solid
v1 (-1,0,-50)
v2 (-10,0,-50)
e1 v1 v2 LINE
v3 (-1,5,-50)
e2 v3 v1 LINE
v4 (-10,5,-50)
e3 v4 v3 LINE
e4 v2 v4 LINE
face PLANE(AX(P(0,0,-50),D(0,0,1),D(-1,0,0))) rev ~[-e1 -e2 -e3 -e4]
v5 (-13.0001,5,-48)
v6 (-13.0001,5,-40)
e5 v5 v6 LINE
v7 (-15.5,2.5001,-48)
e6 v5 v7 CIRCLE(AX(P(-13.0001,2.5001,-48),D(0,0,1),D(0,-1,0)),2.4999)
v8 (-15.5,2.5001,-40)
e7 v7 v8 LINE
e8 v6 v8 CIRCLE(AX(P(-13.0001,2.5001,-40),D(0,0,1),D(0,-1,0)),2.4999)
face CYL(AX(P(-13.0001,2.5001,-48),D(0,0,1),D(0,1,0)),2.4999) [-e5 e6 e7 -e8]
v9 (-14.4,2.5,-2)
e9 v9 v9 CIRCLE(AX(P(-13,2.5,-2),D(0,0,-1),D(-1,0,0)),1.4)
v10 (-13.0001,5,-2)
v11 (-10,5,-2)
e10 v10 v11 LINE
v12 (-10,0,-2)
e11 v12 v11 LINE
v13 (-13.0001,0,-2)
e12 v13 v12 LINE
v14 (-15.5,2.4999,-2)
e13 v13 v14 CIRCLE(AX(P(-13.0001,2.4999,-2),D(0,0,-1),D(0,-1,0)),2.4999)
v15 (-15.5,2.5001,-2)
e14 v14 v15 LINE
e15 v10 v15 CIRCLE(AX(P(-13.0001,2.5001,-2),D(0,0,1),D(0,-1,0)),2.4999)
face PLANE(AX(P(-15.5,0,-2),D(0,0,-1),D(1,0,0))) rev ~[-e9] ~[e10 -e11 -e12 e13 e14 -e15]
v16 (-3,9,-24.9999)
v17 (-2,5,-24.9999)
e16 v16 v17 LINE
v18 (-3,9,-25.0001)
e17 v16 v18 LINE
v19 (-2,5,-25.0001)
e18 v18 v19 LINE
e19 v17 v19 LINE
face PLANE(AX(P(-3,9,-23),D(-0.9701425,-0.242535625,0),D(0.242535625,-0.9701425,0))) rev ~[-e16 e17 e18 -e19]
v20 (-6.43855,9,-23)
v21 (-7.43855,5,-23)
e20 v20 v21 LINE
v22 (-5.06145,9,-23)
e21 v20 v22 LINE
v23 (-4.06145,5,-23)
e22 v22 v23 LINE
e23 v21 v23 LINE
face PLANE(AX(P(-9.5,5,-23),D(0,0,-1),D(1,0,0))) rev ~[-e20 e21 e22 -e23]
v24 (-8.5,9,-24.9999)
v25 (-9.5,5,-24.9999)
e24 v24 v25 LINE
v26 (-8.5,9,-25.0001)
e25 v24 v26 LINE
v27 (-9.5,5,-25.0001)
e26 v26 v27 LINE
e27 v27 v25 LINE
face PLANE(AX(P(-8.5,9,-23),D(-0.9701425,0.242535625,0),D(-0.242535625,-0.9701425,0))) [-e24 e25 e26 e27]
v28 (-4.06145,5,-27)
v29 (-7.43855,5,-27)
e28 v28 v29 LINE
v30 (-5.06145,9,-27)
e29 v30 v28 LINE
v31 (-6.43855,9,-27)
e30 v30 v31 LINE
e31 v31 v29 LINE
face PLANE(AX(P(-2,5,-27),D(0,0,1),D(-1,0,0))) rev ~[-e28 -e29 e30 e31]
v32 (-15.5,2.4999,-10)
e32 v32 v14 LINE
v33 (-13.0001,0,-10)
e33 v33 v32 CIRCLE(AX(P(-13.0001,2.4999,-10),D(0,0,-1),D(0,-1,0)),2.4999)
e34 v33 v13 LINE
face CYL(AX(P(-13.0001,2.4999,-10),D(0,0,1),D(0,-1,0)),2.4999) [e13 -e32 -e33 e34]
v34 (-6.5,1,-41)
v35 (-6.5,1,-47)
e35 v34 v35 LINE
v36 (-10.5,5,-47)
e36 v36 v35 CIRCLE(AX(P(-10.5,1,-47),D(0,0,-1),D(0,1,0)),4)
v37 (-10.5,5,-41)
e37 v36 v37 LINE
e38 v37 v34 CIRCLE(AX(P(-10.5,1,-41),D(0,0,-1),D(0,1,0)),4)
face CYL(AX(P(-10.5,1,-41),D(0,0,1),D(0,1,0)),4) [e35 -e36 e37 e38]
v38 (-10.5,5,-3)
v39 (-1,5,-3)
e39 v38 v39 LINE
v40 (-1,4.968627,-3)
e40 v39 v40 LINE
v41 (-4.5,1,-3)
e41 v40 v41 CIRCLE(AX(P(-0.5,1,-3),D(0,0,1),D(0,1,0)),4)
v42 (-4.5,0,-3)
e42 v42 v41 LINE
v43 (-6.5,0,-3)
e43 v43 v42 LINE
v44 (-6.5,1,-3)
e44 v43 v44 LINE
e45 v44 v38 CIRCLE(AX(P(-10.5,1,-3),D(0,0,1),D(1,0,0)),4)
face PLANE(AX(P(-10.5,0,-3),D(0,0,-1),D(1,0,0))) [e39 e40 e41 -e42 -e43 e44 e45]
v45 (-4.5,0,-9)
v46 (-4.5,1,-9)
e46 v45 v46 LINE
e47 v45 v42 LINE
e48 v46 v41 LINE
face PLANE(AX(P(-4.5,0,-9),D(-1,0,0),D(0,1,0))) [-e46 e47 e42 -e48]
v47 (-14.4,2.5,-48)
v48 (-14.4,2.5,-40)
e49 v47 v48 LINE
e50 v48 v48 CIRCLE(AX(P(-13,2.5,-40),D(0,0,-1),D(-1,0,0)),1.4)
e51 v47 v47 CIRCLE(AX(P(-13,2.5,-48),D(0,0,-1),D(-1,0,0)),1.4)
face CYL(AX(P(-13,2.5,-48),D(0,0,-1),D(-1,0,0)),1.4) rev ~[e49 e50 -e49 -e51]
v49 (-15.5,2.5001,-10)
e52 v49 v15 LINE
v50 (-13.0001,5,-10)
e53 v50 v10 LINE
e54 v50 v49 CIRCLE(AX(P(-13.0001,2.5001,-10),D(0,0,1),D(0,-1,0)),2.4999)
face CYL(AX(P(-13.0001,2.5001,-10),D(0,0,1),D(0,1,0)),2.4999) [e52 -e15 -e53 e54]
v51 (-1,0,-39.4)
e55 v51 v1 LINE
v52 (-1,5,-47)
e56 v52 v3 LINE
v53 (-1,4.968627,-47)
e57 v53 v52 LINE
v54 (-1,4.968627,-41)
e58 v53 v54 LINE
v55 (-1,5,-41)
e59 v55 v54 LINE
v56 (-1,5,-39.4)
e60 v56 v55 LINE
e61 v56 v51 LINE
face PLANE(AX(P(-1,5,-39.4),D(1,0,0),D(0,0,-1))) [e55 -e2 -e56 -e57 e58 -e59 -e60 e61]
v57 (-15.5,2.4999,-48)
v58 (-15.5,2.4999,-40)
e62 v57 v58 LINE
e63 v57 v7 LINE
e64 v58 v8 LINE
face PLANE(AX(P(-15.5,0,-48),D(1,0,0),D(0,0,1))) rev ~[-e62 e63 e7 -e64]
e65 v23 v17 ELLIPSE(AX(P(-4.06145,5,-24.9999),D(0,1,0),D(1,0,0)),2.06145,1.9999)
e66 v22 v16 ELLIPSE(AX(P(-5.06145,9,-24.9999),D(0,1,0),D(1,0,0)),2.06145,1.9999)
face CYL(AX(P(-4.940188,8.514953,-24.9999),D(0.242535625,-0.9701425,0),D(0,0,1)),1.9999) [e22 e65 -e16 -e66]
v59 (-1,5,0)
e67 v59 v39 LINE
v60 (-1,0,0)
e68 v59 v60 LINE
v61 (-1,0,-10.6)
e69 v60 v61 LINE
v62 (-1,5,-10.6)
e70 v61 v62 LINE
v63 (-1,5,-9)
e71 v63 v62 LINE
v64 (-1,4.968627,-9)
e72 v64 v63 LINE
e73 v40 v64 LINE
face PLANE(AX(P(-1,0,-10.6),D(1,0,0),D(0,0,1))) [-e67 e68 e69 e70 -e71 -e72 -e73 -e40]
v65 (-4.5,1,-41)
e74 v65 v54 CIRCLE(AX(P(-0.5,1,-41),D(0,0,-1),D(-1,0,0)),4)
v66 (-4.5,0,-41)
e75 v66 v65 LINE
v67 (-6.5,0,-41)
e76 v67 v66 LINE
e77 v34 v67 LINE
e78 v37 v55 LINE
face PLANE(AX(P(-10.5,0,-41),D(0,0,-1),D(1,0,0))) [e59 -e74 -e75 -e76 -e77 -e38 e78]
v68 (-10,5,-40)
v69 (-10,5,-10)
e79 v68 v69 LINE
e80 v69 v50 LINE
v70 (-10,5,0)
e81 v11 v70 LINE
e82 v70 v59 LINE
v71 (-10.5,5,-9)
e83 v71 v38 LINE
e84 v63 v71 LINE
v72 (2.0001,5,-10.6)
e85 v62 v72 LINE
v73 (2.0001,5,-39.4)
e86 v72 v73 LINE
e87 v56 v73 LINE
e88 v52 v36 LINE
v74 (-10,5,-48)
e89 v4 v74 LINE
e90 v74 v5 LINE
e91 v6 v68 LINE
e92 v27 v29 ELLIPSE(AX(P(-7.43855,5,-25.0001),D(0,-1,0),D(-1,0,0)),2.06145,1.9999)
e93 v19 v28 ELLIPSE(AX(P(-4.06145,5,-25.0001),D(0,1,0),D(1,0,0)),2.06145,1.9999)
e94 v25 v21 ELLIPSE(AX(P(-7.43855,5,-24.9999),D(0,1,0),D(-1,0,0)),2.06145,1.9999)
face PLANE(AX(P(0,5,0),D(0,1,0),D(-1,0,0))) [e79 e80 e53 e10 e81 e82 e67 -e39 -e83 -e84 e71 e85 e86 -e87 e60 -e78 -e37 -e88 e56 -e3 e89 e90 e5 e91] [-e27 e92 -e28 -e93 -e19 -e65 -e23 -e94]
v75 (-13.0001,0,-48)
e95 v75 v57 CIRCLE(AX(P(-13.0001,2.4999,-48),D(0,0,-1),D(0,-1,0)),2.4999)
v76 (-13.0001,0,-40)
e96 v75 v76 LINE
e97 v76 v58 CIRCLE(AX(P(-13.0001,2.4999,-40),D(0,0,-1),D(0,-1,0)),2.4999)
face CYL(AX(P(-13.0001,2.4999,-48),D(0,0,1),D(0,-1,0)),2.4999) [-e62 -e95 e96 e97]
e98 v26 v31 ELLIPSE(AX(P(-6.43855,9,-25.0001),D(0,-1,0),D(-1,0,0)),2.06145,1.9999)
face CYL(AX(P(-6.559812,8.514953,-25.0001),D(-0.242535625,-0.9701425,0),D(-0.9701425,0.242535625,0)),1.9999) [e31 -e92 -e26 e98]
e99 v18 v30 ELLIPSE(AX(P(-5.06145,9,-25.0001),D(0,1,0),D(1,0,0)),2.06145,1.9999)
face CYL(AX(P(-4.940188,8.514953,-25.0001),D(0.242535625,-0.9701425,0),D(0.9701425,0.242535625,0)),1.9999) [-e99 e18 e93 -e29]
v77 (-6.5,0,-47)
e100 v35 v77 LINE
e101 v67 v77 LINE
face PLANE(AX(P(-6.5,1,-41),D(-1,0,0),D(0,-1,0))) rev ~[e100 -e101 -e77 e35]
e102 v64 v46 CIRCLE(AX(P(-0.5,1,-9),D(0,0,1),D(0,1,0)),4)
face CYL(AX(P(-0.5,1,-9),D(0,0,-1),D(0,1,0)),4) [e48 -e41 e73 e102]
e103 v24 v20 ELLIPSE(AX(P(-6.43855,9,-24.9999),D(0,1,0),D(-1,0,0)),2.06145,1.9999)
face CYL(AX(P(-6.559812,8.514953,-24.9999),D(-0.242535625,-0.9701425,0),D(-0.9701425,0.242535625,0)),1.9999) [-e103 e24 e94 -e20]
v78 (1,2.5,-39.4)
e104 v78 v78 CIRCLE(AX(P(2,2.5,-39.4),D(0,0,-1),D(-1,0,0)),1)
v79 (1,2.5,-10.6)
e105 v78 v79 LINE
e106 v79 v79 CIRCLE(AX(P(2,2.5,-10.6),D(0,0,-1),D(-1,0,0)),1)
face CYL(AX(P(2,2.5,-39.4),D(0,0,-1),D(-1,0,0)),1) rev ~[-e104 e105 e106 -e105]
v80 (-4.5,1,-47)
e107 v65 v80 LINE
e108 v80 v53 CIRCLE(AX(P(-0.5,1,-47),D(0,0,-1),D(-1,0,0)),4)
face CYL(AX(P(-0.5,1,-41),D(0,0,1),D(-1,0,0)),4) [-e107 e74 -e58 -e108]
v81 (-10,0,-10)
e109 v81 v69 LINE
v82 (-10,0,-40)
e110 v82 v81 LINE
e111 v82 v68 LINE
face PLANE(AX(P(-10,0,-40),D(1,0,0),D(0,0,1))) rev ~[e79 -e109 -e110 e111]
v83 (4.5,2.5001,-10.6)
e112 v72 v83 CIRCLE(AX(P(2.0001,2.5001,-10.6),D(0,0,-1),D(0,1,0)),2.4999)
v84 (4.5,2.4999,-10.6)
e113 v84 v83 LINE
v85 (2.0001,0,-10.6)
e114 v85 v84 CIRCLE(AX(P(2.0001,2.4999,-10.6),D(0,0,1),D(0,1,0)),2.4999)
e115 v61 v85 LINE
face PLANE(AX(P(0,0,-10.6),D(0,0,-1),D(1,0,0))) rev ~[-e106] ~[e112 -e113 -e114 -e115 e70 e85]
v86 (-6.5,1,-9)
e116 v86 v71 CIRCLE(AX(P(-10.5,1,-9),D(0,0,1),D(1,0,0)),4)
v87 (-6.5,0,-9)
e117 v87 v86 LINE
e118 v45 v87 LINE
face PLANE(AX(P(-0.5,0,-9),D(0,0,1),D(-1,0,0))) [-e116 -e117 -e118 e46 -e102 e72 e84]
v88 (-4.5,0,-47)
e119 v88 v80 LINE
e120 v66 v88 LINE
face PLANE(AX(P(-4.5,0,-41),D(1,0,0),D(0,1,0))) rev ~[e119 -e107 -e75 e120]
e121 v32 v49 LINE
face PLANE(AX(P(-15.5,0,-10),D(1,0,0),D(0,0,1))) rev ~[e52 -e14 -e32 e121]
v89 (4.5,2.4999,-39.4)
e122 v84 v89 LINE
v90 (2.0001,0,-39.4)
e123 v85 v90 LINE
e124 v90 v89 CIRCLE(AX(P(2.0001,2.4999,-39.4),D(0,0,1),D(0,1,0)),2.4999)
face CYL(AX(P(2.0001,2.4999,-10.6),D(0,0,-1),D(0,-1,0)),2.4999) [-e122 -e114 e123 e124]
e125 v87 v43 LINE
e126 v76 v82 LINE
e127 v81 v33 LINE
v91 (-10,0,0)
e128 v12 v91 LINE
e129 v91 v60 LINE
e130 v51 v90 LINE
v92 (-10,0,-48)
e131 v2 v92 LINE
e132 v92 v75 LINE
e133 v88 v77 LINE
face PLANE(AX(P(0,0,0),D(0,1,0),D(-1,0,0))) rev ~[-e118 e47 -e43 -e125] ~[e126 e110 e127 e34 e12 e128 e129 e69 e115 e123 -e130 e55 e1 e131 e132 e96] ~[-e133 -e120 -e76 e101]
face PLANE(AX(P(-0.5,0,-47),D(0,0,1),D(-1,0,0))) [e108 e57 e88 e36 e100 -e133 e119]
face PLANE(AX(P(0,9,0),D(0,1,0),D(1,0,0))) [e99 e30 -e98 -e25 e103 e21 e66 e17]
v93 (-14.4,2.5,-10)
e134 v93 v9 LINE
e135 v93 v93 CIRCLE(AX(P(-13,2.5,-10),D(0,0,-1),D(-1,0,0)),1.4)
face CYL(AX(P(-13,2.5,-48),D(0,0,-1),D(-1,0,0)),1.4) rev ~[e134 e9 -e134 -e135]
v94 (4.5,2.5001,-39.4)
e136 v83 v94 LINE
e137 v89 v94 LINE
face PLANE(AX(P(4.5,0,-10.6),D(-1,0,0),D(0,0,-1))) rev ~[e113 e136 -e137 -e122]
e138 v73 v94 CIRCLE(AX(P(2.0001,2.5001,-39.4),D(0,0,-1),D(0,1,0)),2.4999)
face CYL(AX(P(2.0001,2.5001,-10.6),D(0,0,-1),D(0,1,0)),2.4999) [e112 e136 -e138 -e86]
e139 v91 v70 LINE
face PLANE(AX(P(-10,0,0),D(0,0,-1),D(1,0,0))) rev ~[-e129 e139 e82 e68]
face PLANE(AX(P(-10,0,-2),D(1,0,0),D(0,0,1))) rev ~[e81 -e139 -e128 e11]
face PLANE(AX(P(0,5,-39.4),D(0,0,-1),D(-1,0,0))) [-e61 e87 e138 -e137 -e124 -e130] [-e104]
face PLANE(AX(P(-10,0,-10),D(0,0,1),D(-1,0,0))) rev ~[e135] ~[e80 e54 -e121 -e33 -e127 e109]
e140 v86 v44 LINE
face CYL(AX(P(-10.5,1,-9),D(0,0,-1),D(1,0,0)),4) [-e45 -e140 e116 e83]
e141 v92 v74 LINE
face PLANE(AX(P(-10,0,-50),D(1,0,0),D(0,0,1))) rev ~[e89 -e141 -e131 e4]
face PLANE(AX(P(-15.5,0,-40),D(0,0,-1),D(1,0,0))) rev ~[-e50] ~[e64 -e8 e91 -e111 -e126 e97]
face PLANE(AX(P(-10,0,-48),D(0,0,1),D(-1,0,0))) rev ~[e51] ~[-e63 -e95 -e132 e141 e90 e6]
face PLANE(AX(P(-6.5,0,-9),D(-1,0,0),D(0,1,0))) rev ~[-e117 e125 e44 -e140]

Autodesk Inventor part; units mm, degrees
ref_plane "YZ Plane" through (0, 0, 0) normal (1, 0, 0) x (0, 1, 0)
ref_plane "XZ Plane" through (0, 0, 0) normal (0, 1, 0) x (-1, 0, 0)
sketch "Sketch1" plane through (0, 0, 0) normal (0, 1, 0) x (-1, 0, 0)
  line L0 (0, 0) -> (0, -10.6)
  line L1 (0, -10.6) -> (-4.5, -10.6)
  line L2 (-4.5, -10.6) -> (-4.5, -39.4)
  line L3 (-4.5, -39.4) -> (0, -39.4)
  line L4 (0, -39.4) -> (0, -50)
  line L5 (0, -50) -> (10, -50)
  line L6 (10, -50) -> (10, -48)
  line L7 (10, -48) -> (15.5, -48)
  line L8 (15.5, -48) -> (15.5, -40)
  line L9 (15.5, -40) -> (10, -40)
  line L10 (10, -40) -> (10, -10)
  line L11 (10, -10) -> (15.5, -10)
  line L12 (15.5, -10) -> (15.5, -2)
  line L13 (15.5, -2) -> (10, -2)
  line L14 (10, -2) -> (10, 0)
  line L15 (10, 0) -> (0, 0)
  line L16 (10.5, -3) -> (0.5, -3)
  line L17 (0.5, -3) -> (0.5, -9)
  line L18 (0.5, -9) -> (10.5, -9)
  line L19 (10.5, -9) -> (10.5, -3)
  line L20 (10.5, -41) -> (0.5, -41)
  line L21 (0.5, -41) -> (0.5, -47)
  line L22 (0.5, -47) -> (10.5, -47)
  line L23 (10.5, -47) -> (10.5, -41)
  dimension "d0" = 20
  dimension "d1" = 50
  dimension "d2" = 10.6
  dimension "d3" = 10.6
  dimension "d4" = 2
  dimension "d5" = 2
  dimension "d6" = 8
  dimension "d7" = 8
  dimension "d8" = 4.5
  dimension "d9" = 5.5
  dimension "d10" = 5.5
  dimension "d11" = 5.5
  dimension "d12" = 5.5
  dimension "d13" = 10
  dimension "d14" = 6
  dimension "d15" = 5
  dimension "d16" = 3
  dimension "d17" = 10
  dimension "d18" = 6
  dimension "d19" = 3
extrude "Extrusion1" add sketch "Sketch1" along normal blind 5
sketch "Sketch2" plane through (-10.5, 0, -9) normal (0, 0, 1) x (1, 0, 0)
  point P0 (10.5, 0)
ref_plane "Work Plane1" through (-5.5, 5, -9) normal (0, 0, 1) x (1, 0, 0)
sketch "Sketch4" plane through (-5.5, 5, -9) normal (0, 0, 1) x (1, 0, 0)
  line L0 (-5, -5) -> (5, -5) projected
  line L1 (5, -5) -> (-5, -5) projected
  line L2 (-5, -5) -> (5, -5) projected
  line L3 (5, -5) -> (-5, -5) projected
  line L4 (-4.5, -5) -> (5.5, -5) projected
  line L5 (-10, -5) -> (-4.5, -5) projected
  line L6 (-4.5, -5) -> (-10, -5) projected
  line L7 (-10, -5) -> (-4.5, -5) projected
  line L8 (-4.5, -5) -> (-10, -5) projected
  line L9 (5.5, -5) -> (-4.5, -5) projected
  line L10 (10, -5) -> (5.5, -5) projected
  line L11 (5.5, -5) -> (10, -5) projected
  line L12 (-5, 0) -> (5, 0) projected
  line L13 (5, 0) -> (-5, 0) projected
  line L14 (-5, 0) -> (5, 0) projected
  line L15 (5, 0) -> (-5, 0) projected
  line L16 (5.5, 0) -> (10, 0) projected
  line L17 (10, 0) -> (5.5, 0) projected
  line L18 (5.5, 0) -> (-4.5, 0) projected
  line L19 (-4.5, 0) -> (-10, 0) projected
  line L20 (-10, 0) -> (-4.5, 0) projected
  line L21 (-4.5, 0) -> (-10, 0) projected
  line L22 (-10, 0) -> (-4.5, 0) projected
  line L23 (-4.5, 0) -> (5.5, 0) projected
  line L24 (5, -5) -> (5, 0) projected
  line L25 (-5, -5) -> (-5, 0) projected
  line L26 (5.5, -5) -> (-4.5, -5) projected
  line L27 (-5, -5) -> (-5, 0) construction
  line L28 (-5, -5) -> (0, -5) construction
  line L29 (5, -5) -> (5, 0) projected
  line L30 (5, -5) -> (5, 0) construction
  line L31 (5, -5) -> (10, -5) construction
  line L32 (-5, 0) -> (-5, -5)
  line L33 (0, -5) -> (5, -5)
  line L34 (5, 0) -> (5, -5)
  line L35 (5.5, 0) -> (-4.5, 0) projected
  line L36 (-5, -5) -> (0, -5)
  line L37 (-5, -5) -> (-1, -5)
  line L38 (-1, -5) -> (-1, -4)
  line L39 (5, -5) -> (1, -5)
  line L40 (1, -5) -> (1, -4)
  line L41 (-5, -5) -> (-5, -4)
  line L42 (-5, -5) -> (-5, 0) projected
  line L43 (5, -5) -> (5, -4)
  arc A0 (5, 0) -> (1, -4) centre (5, -4) ccw
  arc A1 (-1, -4) -> (-5, 0) centre (-5, -4) ccw
  dimension "d26" = 90
  dimension "d28" = 90
  dimension "d48" = 4
  dimension "d49" = 1
  dimension "d50" = 4
  dimension "d51" = 1
  dimension "d52" = 4
extrude "Extrusion2" add sketch "Sketch4" along normal blind 6 contours L25 A1 L38 L0 | L40 A0 L24 L0
sketch "Sketch6" plane through (-10, 0, -48) normal (0, 0, -1) x (-1, 0, 0)
  circle A0 centre (3, 2.5) radius 1.4
  line L0 (0, 0) -> (5.5, 0) projected
  line L1 (5.5, 0) -> (5.5, 5) projected
  line L2 (0, 5) -> (5.5, 5) projected
  line L3 (0, 0) -> (0, 5) projected
  point P0 (-10, 0)
  dimension "d34" = 2.5
  dimension "d35" = 2.5
  dimension "d47" = 2.8
extrude "Extrusion4" cut sketch "Sketch6" against normal through all contours A0
sketch "Sketch7" plane through (4.5, 0, -39.4) normal (0, 0, -1) x (-1, 0, 0)
  circle A0 centre (2.5, 2.5) radius 1
  line L0 (0, 5) -> (4.5, 5) projected
  line L1 (0, 0) -> (0, 5) projected
  point P0 (4.5, 0)
  dimension "d38" = 2
  dimension "d39" = 2.5
  dimension "d40" = 2.5
extrude "Extrusion5" cut sketch "Sketch7" against normal through all
sketch "Sketch8" plane through (-10, 0, -10) normal (0, 0, -1) x (-1, 0, 0)
  point P0 (-10, 0)
sketch "Sketch12" plane through (-0.5, 0, -41) normal (0, 0, -1) x (-1, 0, 0)
  line L0 (6, 1) -> (6, 0) projected
  line L1 (4, 0) -> (6, 0) projected
  line L2 (4, 0) -> (4, 1) projected
  arc A0 (4, 1) -> (0, 5) centre (0, 1) ccw projected
  line L3 (10, 5) -> (0, 5) projected
  arc A1 (10, 5) -> (6, 1) centre (10, 1) ccw projected
  arc A2 (4, 1) -> (0, 5) centre (0, 1) ccw
  arc A3 (10, 5) -> (6, 1) centre (10, 1) ccw
  line L4 (4, 0) -> (6, 0) projected
  line L5 (6, 1) -> (6, 0)
  line L6 (6, 0) -> (10, 0)
  line L7 (15, 0) -> (9.5, 0) projected
  line L8 (10, 5) -> (10, 0)
  line L9 (10, 0) -> (6, 0)
  line L10 (9.5, 0) -> (-0.5, 0) projected
  line L11 (4, 0) -> (0, 0)
  arc A4 (4, 1) -> (0, 5) centre (0, 1) ccw projected
  line L12 (0, 0) -> (0, 5)
  line L13 (4, 0) -> (4, 1) projected
  line L14 (4, 0) -> (4, 1)
  dimension "d54" = 5
extrude "Extrusion6" add sketch "Sketch12" along normal blind 6 contours A1 L8 L6 L0 | L10 L12 A0 L2
fillet "Fillet5" radius 2.5 6 edges at (-15.5, 5, -6) (-15.5, 5, -44) (4.5, 5, -25) (-15.5, 0, -6) (4.5, 0, -25) (-15.5, 0, -44)
sketch "Sketch13" plane through (0, 5, 0) normal (0, 1, 0) x (1, 0, 0)
  line L0 (-10, 0) -> (0, 0) projected
  line L1 (0, 0) -> (-1, 0)
  line L2 (-1, 0) -> (-1, 10.5)
  line L3 (-1, 10.5) -> (0, 10.5)
  line L4 (0, 10.5) -> (0, 0)
  line L5 (0, 39.4) -> (0, 50) projected
  line L6 (0, 39.4) -> (-1, 39.4)
  line L7 (-1, 39.4) -> (-1, 50)
  line L8 (-1, 50) -> (0, 50)
  line L9 (0, 50) -> (0, 39.4)
  dimension "d58" = 1
extrude "Extrusion7" cut sketch "Sketch13" against normal through all
sketch "Sketch14" plane through (0, 0, 0) normal (0, -1, 0) x (1, 0, 0)
  point P0 (0, 0)
sketch "Sketch15" plane through (0, 5, 0) normal (0, 1, 0) x (1, 0, 0)
  line L0 (-9.5, 23) -> (-2, 23)
  line L1 (-2, 23) -> (-2, 27)
  line L2 (-2, 27) -> (-9.5, 27)
  line L3 (-9.5, 27) -> (-9.5, 23)
  line L4 (-10, 0) -> (-1, 0) projected
  line L5 (-1, 39.4) -> (-1, 41) projected
  point P0 (0, 0)
  dimension "d61" = 4
  dimension "d62" = 7.5
  dimension "d63" = 23
  dimension "d64" = 1
extrude "Extrusion8" add sketch "Sketch15" along normal blind 4
sketch "Sketch17" plane through (-9.5, 5, -23) normal (0, 0, 1) x (1, 0, 0)
  line L0 (8.5, 0) -> (-1, 0) projected
  line L1 (0, 0) -> (0, 4) projected
  line L2 (0, 0) -> (0, 4)
  line L3 (0, 4) -> (1, 4)
  line L4 (7.5, 4) -> (0, 4) projected
  line L5 (1, 4) -> (0, 0)
  line L6 (7.5, 4) -> (7.5, 0)
  line L7 (7.5, 0) -> (7.5, 4) projected
  line L8 (7.5, 4) -> (6.5, 4)
  line L9 (6.5, 4) -> (7.5, 0)
  point P0 (9.5, -5)
  dimension "d69" = 1
  dimension "d70" = 1
extrude "Extrusion9" cut sketch "Sketch17" against normal through all contours L9 L4 L6 | L1 L3 L5
fillet "Fillet6" radius 2 4 edges at (-9, 7, -23) (-2.5, 7, -23) (-2.5, 7, -27) (-9, 7, -27)
sketch "Sketch18" plane through (0, 0, 0) normal (0, -1, 0) x (1, 0, 0)
  line L0 (0, -10.5) -> (0, -10.6) projected
  line L1 (0, -10.5) -> (0, -10.6)
  line L2 (0, -10.6) -> (-1, -10.6)
  line L3 (-1, -9) -> (-1, -10.5) projected
  line L4 (-1, -10.6) -> (-1, -10.5)
  line L5 (-1, -10.5) -> (0, -10.5)
  point P0 (0, 0)
  dimension "d74" = 1
extrude "Extrusion10" cut sketch "Sketch18" against normal through all
properties part number "tracks"
